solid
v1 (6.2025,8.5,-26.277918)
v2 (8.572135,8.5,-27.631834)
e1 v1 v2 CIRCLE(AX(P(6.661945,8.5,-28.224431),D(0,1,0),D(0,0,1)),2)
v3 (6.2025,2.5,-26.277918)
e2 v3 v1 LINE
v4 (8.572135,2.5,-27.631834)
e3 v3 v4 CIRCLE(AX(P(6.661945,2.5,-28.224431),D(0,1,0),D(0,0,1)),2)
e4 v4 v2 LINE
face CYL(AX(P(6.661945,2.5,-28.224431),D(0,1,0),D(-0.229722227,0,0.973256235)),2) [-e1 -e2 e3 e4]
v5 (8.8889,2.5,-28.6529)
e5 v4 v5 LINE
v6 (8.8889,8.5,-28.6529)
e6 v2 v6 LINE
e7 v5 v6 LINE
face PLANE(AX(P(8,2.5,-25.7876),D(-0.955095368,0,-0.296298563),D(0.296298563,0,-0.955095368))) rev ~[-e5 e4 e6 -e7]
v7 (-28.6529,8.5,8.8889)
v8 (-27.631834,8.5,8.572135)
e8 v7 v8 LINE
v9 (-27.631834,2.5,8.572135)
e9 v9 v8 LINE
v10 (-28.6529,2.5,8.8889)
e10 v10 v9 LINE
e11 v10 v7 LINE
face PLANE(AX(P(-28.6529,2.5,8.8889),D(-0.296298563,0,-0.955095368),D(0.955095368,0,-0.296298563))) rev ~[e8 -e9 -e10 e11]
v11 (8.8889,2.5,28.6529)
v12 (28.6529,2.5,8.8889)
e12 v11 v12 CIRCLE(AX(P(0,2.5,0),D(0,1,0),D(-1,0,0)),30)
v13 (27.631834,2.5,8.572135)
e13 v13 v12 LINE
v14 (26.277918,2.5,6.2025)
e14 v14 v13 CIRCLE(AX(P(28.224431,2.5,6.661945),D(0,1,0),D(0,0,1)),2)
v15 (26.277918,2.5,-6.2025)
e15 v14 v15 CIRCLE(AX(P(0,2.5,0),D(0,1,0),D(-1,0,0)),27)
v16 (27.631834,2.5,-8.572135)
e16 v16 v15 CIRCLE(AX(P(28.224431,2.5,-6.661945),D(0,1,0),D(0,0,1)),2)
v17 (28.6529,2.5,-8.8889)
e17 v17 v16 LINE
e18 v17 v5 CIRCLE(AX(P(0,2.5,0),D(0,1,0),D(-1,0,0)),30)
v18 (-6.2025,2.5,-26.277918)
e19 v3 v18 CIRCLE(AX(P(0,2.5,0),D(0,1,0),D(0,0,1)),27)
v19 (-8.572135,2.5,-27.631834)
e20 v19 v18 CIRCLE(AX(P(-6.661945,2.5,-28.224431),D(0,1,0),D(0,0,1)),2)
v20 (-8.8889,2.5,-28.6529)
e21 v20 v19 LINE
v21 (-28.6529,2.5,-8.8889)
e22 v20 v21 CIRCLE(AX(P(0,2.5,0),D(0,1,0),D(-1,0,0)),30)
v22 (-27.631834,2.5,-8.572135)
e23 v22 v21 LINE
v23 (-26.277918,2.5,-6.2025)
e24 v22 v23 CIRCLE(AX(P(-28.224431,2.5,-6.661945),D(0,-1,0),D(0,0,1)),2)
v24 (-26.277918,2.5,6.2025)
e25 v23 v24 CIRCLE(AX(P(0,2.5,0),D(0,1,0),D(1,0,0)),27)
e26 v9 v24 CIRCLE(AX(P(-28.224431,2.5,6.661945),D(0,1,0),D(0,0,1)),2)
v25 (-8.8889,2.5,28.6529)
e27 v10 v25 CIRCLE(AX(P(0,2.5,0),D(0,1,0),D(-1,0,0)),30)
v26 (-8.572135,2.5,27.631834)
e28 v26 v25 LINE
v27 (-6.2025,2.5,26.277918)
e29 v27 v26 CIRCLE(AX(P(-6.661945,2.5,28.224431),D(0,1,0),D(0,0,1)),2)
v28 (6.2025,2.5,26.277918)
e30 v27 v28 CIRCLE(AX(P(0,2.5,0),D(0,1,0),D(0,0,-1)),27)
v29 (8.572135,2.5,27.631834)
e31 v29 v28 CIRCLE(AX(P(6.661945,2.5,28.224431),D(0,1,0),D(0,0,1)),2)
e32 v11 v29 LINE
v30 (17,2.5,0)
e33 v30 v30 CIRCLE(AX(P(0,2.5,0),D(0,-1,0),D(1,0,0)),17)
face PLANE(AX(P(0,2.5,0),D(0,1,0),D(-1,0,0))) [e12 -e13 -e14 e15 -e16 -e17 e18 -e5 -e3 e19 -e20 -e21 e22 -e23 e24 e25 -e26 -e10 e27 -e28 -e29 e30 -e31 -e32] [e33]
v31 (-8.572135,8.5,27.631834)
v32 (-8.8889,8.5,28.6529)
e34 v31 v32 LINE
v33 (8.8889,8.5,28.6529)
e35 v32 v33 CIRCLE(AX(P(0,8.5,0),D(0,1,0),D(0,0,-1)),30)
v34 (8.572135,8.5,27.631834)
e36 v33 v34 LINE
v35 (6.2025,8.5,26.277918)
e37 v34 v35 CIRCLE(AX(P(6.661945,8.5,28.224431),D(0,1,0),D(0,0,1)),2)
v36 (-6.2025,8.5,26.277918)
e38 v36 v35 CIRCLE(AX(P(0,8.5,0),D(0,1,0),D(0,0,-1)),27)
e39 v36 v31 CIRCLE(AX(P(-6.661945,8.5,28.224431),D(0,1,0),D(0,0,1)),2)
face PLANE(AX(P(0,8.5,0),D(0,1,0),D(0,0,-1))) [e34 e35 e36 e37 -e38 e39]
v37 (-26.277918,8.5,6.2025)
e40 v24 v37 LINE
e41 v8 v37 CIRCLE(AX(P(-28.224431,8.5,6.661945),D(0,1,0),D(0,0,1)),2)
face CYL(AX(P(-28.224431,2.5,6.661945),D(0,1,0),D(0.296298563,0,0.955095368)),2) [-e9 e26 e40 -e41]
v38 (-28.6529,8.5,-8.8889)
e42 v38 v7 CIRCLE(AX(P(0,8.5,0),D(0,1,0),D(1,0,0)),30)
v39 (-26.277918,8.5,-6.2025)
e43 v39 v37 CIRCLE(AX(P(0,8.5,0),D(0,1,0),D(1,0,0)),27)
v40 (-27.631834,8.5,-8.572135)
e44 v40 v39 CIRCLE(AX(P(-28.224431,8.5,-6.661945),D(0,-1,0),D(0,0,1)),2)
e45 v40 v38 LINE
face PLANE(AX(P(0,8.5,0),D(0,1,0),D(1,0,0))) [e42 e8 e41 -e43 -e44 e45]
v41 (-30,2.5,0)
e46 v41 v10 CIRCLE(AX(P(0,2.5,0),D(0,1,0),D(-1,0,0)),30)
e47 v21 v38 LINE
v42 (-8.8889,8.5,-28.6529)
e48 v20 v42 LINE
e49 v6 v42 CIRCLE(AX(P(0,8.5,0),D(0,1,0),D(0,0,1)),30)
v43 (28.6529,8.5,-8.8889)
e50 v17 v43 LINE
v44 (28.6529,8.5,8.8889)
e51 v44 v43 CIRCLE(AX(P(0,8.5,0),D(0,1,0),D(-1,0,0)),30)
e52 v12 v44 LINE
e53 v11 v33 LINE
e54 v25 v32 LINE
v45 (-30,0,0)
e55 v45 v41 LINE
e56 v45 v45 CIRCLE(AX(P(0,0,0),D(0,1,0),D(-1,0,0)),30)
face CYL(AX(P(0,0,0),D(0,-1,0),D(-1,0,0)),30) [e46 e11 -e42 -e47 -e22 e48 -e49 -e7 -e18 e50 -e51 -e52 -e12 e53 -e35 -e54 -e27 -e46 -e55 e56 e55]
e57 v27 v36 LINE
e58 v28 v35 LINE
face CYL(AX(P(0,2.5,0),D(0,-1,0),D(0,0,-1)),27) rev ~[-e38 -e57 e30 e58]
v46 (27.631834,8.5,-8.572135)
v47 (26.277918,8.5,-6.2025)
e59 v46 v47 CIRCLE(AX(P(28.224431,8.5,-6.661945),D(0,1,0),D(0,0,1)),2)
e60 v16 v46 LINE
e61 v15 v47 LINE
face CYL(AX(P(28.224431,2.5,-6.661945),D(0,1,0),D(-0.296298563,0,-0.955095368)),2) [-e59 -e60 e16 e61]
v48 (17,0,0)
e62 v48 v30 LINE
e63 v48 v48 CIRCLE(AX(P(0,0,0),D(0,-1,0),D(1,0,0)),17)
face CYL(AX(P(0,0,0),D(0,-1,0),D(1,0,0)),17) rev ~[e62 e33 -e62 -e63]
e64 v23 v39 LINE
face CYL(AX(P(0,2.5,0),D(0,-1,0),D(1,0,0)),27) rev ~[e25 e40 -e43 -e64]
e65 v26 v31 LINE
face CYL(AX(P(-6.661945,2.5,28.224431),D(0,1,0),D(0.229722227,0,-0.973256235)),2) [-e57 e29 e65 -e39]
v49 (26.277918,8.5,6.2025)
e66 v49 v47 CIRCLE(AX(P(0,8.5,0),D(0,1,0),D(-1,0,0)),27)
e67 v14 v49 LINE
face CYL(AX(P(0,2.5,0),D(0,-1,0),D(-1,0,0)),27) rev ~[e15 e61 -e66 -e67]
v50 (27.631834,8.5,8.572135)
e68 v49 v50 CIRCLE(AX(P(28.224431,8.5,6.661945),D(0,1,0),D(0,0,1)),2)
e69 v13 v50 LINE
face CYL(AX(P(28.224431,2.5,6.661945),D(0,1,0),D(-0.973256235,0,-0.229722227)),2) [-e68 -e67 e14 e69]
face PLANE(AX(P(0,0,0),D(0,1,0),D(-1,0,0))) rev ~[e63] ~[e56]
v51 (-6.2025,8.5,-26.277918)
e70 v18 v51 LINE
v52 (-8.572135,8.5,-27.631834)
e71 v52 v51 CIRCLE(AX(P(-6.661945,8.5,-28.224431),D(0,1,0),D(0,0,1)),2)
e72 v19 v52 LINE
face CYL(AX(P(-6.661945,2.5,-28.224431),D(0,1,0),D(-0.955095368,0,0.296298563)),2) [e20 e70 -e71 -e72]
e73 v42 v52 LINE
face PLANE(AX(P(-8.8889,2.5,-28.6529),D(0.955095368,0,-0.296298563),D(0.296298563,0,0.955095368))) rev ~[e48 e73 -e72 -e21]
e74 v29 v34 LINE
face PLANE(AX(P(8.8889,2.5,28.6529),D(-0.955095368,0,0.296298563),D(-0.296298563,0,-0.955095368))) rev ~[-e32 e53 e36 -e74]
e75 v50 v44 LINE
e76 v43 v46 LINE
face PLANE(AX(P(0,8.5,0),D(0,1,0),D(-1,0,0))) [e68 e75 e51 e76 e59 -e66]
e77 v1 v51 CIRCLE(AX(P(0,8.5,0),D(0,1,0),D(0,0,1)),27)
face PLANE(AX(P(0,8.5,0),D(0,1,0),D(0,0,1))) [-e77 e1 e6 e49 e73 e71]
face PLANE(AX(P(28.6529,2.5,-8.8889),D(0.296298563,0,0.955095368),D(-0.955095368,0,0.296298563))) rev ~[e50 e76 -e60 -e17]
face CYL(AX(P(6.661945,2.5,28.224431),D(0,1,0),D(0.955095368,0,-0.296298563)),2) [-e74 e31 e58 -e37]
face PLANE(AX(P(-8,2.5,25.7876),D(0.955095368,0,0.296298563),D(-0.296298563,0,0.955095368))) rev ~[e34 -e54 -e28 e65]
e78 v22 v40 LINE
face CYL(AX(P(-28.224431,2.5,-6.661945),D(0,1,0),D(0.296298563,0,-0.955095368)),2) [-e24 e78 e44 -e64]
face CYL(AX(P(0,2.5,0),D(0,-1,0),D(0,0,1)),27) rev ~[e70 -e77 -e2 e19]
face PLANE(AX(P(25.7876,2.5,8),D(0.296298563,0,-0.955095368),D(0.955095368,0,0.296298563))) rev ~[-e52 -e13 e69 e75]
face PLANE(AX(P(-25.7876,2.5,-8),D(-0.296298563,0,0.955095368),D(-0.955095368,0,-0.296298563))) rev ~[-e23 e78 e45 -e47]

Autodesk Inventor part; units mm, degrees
ref_plane "YZ Plane" through (0, 0, 0) normal (1, 0, 0) x (0, 1, 0)
ref_plane "XZ Plane" through (0, 0, 0) normal (0, 1, 0) x (-1, 0, 0)
ref_plane "XY Plane" through (0, 0, 0) normal (0, 0, 1) x (1, 0, 0)
sketch "Sketch1" plane through (0, 0, 0) normal (0, 1, 0) x (-1, 0, 0)
  circle A0 centre (0, 0) radius 30
  dimension "d0" = 60
extrude "Extrusion1" add sketch "Sketch1" along normal blind 2.5
sketch "Sketch2" plane through (0, 2.5, 0) normal (0, 1, 0) x (1, 0, 0)
  circle A0 centre (0, 0) radius 30 projected
  circle A1 centre (0, 0) radius 27
  circle A2 centre (0, 0) radius 30 construction
  line L0 (-28.6529, -8.8889) -> (-25.7876, -8)
  line L1 (-25.7876, 8) -> (-28.6529, 8.8889)
  line L2 (-25.7876, -8) -> (-25.7876, 8) construction
  arc A3 (-28.6529, 8.8889) -> (-28.6529, -8.8889) centre (0, 0) ccw
  arc A4 (-25.7876, 8) -> (-25.7876, -8) centre (0, 0) ccw
  dimension "d3" = 3
  dimension "d4" = 16
extrude "Extrusion2" add sketch "Sketch2" along normal blind 6 contours L1 A1 L0 A0 picked at (-28.0966, 6.6307)
fillet "Fillet1" radius 2 2 edges at (-25.7876, 5.5, 8) (-25.7876, 5.5, -8)
pattern_circular "Circular Pattern1" count 4 over 360 about axis through (0, 0, 0) along (0, 1, 0) of "Fillet1", "Extrusion2"
sketch "Sketch3" plane through (0, 0, 0) normal (0, -1, 0) x (1, 0, 0)
  circle A0 centre (0, 0) radius 17
  dimension "d11" = 34
extrude "Extrusion3" cut sketch "Sketch3" against normal through all
properties part number "button_barrel" material "ABS Plastic"
